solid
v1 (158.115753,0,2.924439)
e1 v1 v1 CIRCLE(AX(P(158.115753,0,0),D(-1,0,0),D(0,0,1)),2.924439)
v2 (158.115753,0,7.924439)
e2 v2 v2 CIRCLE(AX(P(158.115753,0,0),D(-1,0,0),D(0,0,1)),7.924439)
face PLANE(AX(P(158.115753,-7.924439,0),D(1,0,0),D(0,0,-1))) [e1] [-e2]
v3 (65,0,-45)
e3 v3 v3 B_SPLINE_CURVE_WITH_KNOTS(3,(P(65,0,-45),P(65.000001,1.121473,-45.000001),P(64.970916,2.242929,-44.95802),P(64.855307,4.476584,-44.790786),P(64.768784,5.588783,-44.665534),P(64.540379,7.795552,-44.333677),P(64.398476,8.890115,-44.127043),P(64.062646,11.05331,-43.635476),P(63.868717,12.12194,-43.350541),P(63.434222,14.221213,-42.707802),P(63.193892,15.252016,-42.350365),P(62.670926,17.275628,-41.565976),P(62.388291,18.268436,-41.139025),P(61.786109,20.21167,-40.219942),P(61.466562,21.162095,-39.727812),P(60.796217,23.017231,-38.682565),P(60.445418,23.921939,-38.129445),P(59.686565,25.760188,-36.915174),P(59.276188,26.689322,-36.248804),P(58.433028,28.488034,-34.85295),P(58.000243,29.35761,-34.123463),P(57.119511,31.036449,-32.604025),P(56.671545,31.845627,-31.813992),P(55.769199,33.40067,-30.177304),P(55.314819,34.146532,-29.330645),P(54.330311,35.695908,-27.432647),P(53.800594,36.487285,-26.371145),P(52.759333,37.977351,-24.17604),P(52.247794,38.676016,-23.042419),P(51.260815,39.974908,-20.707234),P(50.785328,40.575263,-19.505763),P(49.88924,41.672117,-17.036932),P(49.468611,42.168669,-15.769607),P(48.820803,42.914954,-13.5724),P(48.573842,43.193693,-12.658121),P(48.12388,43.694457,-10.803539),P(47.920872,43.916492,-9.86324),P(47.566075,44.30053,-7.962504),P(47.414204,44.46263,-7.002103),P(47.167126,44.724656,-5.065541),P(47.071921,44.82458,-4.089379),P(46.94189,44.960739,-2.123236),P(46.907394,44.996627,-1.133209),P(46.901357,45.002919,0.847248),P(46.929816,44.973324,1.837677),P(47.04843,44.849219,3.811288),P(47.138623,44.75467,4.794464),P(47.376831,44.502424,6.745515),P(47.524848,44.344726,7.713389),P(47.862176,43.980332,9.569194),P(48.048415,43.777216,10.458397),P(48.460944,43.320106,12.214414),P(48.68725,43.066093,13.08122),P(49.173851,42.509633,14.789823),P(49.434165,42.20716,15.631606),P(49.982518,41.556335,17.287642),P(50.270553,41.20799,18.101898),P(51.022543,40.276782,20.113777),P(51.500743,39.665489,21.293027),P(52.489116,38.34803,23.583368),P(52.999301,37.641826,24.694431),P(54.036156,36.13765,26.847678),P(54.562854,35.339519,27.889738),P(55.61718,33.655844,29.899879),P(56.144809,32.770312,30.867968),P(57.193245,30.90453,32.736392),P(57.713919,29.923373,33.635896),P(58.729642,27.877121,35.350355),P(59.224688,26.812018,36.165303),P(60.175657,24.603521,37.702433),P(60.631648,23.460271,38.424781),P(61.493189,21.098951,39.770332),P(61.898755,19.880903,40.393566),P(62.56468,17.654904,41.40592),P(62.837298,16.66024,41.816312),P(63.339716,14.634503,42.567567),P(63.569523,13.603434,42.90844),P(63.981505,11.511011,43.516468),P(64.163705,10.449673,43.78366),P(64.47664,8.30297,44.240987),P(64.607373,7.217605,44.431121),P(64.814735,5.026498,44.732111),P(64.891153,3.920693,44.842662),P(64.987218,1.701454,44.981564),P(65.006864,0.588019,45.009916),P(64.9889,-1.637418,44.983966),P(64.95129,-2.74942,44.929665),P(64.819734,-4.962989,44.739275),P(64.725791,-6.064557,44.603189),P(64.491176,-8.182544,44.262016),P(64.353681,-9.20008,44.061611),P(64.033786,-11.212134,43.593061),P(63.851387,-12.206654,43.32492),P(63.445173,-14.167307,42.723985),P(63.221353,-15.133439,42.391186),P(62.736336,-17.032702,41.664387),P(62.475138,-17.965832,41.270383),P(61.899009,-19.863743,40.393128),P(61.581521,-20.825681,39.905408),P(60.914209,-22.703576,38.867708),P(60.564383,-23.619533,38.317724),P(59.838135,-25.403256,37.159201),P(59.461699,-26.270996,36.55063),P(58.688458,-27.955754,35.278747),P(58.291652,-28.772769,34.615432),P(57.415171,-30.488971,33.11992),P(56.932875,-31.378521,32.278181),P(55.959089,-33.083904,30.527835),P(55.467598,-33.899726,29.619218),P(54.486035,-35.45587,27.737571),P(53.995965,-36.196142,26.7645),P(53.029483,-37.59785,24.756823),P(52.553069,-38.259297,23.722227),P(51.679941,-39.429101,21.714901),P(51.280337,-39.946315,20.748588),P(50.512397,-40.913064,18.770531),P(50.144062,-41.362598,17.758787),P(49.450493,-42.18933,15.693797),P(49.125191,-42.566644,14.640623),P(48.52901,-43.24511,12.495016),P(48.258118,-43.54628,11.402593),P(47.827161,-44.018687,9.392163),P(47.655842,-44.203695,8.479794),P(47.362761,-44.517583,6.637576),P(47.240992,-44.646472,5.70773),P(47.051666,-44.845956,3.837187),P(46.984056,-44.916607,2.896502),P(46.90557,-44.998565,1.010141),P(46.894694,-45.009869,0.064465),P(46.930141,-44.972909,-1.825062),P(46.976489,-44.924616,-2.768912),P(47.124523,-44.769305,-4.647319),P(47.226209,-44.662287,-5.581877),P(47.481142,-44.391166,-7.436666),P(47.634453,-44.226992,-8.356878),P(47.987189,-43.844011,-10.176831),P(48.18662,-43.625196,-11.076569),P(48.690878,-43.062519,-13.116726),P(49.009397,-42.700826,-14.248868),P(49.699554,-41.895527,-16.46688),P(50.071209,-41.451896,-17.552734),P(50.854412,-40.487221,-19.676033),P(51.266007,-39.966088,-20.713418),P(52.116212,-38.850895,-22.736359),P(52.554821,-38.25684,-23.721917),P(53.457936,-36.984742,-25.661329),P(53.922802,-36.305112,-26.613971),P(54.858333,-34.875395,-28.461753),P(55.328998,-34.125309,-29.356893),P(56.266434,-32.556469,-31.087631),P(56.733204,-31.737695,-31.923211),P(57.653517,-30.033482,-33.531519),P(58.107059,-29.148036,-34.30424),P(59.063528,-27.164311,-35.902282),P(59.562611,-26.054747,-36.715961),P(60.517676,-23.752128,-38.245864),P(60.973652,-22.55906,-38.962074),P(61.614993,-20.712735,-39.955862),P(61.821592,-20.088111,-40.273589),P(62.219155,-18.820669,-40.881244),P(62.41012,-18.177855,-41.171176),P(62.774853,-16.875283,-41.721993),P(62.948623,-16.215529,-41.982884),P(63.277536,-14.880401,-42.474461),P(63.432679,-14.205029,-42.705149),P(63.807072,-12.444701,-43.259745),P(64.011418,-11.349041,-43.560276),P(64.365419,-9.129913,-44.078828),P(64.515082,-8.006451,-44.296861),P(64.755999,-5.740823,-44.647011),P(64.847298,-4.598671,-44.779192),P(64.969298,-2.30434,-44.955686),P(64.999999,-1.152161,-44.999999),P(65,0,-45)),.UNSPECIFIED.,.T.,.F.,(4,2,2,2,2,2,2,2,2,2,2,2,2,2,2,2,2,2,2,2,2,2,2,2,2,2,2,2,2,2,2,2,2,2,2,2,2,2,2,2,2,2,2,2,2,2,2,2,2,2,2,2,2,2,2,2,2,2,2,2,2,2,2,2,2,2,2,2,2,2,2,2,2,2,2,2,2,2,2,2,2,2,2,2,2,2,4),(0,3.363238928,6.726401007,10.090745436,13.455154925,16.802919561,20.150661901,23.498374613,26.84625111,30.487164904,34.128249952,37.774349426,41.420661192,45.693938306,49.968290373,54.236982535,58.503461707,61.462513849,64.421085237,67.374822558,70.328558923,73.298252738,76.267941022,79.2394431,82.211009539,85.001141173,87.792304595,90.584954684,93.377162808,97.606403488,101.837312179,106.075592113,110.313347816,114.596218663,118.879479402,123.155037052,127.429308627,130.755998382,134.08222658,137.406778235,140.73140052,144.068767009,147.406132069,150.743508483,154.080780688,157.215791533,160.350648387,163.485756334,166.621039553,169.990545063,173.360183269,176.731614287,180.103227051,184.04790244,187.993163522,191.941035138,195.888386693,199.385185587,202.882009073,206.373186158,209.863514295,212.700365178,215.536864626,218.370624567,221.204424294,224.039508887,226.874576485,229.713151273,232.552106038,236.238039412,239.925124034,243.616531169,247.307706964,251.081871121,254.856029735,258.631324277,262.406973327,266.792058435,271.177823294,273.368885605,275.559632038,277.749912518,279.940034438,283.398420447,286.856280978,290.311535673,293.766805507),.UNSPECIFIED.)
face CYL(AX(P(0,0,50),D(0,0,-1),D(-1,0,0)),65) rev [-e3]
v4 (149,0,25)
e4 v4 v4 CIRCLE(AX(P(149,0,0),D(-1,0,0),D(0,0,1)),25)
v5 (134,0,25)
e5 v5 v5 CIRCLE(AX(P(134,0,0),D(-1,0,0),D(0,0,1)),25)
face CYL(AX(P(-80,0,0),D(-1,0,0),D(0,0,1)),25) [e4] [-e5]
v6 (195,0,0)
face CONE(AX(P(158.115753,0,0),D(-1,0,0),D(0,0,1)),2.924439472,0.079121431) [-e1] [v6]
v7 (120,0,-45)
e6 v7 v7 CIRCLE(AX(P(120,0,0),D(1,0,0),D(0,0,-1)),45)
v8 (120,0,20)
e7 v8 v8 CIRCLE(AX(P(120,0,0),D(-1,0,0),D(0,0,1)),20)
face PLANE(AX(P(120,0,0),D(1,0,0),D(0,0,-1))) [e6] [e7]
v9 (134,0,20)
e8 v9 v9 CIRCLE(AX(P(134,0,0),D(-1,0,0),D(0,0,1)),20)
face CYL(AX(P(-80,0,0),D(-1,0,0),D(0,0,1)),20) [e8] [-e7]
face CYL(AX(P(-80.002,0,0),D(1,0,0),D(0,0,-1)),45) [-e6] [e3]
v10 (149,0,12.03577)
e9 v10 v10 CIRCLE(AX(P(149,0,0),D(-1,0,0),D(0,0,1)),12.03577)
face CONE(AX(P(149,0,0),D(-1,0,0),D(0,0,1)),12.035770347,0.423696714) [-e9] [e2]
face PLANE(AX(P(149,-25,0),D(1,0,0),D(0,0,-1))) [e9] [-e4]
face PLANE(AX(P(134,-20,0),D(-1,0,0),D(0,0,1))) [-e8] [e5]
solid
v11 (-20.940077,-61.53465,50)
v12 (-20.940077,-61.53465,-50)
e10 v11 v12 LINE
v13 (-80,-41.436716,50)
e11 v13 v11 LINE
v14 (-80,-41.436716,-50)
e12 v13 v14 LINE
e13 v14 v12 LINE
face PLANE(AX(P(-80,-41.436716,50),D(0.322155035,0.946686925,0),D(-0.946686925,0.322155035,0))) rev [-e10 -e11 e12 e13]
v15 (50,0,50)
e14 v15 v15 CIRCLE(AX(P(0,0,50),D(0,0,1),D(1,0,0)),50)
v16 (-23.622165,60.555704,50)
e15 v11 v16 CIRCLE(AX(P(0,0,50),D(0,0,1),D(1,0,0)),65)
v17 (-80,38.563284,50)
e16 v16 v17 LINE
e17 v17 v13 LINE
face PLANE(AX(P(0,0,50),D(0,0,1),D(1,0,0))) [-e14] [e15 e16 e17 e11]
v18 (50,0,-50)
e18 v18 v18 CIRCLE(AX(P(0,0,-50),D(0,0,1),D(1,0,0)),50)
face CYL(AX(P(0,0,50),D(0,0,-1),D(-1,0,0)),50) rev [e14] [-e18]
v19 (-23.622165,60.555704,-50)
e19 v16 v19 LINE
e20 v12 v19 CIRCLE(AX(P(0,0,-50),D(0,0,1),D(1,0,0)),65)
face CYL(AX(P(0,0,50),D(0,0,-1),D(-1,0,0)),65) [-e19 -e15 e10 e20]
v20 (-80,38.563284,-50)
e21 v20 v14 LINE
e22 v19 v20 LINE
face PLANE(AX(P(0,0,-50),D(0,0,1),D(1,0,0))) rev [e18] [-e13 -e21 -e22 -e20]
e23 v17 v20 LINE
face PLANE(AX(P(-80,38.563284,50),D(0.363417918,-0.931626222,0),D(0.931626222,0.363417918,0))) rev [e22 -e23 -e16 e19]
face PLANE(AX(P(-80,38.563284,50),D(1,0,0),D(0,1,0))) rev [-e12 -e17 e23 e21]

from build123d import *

# Parameters (mm, degrees)
SKETCH1_R               = 50
BOSS_EXTRUDE1_DEPTH     = 50
BOSS_EXTRUDE2_START     = -73.095841729
BOSS_EXTRUDE2_OUTLINE_R = 45
BOSS_EXTRUDE2_DEPTH     = 73.095841729
BOSS_EXTRUDE2_START_2   = -46
BOSS_EXTRUDE2_2_DEPTH   = 92


with BuildPart() as part:
    # Sketch1 → Boss-Extrude1 (new, symmetric)
    with BuildSketch(Plane.XY):
        with BuildLine():
            Line((-80, 38.563284016), (-23.622164647, 60.555704417))
            ThreePointArc((-23.622164647, 60.555704417), (64.984321325, 1.427579024), (-20.940077251, -61.534650115))
            Line((-20.940077251, -61.534650115), (-80, -41.436715984))
            Line((-80, -41.436715984), (-80, 38.563284016))
        make_face()
        Circle(SKETCH1_R, mode=Mode.SUBTRACT)
    extrude(amount=BOSS_EXTRUDE1_DEPTH, both=True)


with BuildPart() as body_2:
    # Boss-Extrude2: read off the stored shape, not the designer's step
    # Boss-Extrude2 outline → Boss-Extrude2 (new body)
    with BuildSketch(Plane(origin=(120, 0, 0), x_dir=(0, 0, -1), z_dir=(1, 0, 0)).offset(BOSS_EXTRUDE2_START)):
        Circle(BOSS_EXTRUDE2_OUTLINE_R)
    extrude(amount=BOSS_EXTRUDE2_DEPTH)

    # Boss-Extrude2 2 outline → Boss-Extrude2 2 (cut)
    with BuildSketch(Plane.XY.offset(BOSS_EXTRUDE2_START_2)):
        with BuildLine():
            ThreePointArc((46.904157921, -44.999999664), (65, 0), (46.90415792, 44.999999664))
            Line((46.90415792, 44.999999664), (46.904157921, -44.999999664))
        make_face()
    extrude(amount=BOSS_EXTRUDE2_2_DEPTH, mode=Mode.SUBTRACT)

    # Sketch3 → Revolve1 (revolve)
    with BuildSketch(Plane.XY, mode=Mode.PRIVATE) as revolve1_sk:
        Polygon((120, 0), (120, -20), (134, -20), (134, -25), (149, -25), (149, -12.035770347), (158.115753312, -7.924439472), (158.115753312, -2.924439472), (195, 0), align=None)
    revolve(revolve1_sk.sketch.rotate(Axis((-80, 0, 0), (1, 0, 0)), 270), axis=Axis((-80, 0, 0), (1, 0, 0)))


solid = Compound([part.part, body_2.part])
